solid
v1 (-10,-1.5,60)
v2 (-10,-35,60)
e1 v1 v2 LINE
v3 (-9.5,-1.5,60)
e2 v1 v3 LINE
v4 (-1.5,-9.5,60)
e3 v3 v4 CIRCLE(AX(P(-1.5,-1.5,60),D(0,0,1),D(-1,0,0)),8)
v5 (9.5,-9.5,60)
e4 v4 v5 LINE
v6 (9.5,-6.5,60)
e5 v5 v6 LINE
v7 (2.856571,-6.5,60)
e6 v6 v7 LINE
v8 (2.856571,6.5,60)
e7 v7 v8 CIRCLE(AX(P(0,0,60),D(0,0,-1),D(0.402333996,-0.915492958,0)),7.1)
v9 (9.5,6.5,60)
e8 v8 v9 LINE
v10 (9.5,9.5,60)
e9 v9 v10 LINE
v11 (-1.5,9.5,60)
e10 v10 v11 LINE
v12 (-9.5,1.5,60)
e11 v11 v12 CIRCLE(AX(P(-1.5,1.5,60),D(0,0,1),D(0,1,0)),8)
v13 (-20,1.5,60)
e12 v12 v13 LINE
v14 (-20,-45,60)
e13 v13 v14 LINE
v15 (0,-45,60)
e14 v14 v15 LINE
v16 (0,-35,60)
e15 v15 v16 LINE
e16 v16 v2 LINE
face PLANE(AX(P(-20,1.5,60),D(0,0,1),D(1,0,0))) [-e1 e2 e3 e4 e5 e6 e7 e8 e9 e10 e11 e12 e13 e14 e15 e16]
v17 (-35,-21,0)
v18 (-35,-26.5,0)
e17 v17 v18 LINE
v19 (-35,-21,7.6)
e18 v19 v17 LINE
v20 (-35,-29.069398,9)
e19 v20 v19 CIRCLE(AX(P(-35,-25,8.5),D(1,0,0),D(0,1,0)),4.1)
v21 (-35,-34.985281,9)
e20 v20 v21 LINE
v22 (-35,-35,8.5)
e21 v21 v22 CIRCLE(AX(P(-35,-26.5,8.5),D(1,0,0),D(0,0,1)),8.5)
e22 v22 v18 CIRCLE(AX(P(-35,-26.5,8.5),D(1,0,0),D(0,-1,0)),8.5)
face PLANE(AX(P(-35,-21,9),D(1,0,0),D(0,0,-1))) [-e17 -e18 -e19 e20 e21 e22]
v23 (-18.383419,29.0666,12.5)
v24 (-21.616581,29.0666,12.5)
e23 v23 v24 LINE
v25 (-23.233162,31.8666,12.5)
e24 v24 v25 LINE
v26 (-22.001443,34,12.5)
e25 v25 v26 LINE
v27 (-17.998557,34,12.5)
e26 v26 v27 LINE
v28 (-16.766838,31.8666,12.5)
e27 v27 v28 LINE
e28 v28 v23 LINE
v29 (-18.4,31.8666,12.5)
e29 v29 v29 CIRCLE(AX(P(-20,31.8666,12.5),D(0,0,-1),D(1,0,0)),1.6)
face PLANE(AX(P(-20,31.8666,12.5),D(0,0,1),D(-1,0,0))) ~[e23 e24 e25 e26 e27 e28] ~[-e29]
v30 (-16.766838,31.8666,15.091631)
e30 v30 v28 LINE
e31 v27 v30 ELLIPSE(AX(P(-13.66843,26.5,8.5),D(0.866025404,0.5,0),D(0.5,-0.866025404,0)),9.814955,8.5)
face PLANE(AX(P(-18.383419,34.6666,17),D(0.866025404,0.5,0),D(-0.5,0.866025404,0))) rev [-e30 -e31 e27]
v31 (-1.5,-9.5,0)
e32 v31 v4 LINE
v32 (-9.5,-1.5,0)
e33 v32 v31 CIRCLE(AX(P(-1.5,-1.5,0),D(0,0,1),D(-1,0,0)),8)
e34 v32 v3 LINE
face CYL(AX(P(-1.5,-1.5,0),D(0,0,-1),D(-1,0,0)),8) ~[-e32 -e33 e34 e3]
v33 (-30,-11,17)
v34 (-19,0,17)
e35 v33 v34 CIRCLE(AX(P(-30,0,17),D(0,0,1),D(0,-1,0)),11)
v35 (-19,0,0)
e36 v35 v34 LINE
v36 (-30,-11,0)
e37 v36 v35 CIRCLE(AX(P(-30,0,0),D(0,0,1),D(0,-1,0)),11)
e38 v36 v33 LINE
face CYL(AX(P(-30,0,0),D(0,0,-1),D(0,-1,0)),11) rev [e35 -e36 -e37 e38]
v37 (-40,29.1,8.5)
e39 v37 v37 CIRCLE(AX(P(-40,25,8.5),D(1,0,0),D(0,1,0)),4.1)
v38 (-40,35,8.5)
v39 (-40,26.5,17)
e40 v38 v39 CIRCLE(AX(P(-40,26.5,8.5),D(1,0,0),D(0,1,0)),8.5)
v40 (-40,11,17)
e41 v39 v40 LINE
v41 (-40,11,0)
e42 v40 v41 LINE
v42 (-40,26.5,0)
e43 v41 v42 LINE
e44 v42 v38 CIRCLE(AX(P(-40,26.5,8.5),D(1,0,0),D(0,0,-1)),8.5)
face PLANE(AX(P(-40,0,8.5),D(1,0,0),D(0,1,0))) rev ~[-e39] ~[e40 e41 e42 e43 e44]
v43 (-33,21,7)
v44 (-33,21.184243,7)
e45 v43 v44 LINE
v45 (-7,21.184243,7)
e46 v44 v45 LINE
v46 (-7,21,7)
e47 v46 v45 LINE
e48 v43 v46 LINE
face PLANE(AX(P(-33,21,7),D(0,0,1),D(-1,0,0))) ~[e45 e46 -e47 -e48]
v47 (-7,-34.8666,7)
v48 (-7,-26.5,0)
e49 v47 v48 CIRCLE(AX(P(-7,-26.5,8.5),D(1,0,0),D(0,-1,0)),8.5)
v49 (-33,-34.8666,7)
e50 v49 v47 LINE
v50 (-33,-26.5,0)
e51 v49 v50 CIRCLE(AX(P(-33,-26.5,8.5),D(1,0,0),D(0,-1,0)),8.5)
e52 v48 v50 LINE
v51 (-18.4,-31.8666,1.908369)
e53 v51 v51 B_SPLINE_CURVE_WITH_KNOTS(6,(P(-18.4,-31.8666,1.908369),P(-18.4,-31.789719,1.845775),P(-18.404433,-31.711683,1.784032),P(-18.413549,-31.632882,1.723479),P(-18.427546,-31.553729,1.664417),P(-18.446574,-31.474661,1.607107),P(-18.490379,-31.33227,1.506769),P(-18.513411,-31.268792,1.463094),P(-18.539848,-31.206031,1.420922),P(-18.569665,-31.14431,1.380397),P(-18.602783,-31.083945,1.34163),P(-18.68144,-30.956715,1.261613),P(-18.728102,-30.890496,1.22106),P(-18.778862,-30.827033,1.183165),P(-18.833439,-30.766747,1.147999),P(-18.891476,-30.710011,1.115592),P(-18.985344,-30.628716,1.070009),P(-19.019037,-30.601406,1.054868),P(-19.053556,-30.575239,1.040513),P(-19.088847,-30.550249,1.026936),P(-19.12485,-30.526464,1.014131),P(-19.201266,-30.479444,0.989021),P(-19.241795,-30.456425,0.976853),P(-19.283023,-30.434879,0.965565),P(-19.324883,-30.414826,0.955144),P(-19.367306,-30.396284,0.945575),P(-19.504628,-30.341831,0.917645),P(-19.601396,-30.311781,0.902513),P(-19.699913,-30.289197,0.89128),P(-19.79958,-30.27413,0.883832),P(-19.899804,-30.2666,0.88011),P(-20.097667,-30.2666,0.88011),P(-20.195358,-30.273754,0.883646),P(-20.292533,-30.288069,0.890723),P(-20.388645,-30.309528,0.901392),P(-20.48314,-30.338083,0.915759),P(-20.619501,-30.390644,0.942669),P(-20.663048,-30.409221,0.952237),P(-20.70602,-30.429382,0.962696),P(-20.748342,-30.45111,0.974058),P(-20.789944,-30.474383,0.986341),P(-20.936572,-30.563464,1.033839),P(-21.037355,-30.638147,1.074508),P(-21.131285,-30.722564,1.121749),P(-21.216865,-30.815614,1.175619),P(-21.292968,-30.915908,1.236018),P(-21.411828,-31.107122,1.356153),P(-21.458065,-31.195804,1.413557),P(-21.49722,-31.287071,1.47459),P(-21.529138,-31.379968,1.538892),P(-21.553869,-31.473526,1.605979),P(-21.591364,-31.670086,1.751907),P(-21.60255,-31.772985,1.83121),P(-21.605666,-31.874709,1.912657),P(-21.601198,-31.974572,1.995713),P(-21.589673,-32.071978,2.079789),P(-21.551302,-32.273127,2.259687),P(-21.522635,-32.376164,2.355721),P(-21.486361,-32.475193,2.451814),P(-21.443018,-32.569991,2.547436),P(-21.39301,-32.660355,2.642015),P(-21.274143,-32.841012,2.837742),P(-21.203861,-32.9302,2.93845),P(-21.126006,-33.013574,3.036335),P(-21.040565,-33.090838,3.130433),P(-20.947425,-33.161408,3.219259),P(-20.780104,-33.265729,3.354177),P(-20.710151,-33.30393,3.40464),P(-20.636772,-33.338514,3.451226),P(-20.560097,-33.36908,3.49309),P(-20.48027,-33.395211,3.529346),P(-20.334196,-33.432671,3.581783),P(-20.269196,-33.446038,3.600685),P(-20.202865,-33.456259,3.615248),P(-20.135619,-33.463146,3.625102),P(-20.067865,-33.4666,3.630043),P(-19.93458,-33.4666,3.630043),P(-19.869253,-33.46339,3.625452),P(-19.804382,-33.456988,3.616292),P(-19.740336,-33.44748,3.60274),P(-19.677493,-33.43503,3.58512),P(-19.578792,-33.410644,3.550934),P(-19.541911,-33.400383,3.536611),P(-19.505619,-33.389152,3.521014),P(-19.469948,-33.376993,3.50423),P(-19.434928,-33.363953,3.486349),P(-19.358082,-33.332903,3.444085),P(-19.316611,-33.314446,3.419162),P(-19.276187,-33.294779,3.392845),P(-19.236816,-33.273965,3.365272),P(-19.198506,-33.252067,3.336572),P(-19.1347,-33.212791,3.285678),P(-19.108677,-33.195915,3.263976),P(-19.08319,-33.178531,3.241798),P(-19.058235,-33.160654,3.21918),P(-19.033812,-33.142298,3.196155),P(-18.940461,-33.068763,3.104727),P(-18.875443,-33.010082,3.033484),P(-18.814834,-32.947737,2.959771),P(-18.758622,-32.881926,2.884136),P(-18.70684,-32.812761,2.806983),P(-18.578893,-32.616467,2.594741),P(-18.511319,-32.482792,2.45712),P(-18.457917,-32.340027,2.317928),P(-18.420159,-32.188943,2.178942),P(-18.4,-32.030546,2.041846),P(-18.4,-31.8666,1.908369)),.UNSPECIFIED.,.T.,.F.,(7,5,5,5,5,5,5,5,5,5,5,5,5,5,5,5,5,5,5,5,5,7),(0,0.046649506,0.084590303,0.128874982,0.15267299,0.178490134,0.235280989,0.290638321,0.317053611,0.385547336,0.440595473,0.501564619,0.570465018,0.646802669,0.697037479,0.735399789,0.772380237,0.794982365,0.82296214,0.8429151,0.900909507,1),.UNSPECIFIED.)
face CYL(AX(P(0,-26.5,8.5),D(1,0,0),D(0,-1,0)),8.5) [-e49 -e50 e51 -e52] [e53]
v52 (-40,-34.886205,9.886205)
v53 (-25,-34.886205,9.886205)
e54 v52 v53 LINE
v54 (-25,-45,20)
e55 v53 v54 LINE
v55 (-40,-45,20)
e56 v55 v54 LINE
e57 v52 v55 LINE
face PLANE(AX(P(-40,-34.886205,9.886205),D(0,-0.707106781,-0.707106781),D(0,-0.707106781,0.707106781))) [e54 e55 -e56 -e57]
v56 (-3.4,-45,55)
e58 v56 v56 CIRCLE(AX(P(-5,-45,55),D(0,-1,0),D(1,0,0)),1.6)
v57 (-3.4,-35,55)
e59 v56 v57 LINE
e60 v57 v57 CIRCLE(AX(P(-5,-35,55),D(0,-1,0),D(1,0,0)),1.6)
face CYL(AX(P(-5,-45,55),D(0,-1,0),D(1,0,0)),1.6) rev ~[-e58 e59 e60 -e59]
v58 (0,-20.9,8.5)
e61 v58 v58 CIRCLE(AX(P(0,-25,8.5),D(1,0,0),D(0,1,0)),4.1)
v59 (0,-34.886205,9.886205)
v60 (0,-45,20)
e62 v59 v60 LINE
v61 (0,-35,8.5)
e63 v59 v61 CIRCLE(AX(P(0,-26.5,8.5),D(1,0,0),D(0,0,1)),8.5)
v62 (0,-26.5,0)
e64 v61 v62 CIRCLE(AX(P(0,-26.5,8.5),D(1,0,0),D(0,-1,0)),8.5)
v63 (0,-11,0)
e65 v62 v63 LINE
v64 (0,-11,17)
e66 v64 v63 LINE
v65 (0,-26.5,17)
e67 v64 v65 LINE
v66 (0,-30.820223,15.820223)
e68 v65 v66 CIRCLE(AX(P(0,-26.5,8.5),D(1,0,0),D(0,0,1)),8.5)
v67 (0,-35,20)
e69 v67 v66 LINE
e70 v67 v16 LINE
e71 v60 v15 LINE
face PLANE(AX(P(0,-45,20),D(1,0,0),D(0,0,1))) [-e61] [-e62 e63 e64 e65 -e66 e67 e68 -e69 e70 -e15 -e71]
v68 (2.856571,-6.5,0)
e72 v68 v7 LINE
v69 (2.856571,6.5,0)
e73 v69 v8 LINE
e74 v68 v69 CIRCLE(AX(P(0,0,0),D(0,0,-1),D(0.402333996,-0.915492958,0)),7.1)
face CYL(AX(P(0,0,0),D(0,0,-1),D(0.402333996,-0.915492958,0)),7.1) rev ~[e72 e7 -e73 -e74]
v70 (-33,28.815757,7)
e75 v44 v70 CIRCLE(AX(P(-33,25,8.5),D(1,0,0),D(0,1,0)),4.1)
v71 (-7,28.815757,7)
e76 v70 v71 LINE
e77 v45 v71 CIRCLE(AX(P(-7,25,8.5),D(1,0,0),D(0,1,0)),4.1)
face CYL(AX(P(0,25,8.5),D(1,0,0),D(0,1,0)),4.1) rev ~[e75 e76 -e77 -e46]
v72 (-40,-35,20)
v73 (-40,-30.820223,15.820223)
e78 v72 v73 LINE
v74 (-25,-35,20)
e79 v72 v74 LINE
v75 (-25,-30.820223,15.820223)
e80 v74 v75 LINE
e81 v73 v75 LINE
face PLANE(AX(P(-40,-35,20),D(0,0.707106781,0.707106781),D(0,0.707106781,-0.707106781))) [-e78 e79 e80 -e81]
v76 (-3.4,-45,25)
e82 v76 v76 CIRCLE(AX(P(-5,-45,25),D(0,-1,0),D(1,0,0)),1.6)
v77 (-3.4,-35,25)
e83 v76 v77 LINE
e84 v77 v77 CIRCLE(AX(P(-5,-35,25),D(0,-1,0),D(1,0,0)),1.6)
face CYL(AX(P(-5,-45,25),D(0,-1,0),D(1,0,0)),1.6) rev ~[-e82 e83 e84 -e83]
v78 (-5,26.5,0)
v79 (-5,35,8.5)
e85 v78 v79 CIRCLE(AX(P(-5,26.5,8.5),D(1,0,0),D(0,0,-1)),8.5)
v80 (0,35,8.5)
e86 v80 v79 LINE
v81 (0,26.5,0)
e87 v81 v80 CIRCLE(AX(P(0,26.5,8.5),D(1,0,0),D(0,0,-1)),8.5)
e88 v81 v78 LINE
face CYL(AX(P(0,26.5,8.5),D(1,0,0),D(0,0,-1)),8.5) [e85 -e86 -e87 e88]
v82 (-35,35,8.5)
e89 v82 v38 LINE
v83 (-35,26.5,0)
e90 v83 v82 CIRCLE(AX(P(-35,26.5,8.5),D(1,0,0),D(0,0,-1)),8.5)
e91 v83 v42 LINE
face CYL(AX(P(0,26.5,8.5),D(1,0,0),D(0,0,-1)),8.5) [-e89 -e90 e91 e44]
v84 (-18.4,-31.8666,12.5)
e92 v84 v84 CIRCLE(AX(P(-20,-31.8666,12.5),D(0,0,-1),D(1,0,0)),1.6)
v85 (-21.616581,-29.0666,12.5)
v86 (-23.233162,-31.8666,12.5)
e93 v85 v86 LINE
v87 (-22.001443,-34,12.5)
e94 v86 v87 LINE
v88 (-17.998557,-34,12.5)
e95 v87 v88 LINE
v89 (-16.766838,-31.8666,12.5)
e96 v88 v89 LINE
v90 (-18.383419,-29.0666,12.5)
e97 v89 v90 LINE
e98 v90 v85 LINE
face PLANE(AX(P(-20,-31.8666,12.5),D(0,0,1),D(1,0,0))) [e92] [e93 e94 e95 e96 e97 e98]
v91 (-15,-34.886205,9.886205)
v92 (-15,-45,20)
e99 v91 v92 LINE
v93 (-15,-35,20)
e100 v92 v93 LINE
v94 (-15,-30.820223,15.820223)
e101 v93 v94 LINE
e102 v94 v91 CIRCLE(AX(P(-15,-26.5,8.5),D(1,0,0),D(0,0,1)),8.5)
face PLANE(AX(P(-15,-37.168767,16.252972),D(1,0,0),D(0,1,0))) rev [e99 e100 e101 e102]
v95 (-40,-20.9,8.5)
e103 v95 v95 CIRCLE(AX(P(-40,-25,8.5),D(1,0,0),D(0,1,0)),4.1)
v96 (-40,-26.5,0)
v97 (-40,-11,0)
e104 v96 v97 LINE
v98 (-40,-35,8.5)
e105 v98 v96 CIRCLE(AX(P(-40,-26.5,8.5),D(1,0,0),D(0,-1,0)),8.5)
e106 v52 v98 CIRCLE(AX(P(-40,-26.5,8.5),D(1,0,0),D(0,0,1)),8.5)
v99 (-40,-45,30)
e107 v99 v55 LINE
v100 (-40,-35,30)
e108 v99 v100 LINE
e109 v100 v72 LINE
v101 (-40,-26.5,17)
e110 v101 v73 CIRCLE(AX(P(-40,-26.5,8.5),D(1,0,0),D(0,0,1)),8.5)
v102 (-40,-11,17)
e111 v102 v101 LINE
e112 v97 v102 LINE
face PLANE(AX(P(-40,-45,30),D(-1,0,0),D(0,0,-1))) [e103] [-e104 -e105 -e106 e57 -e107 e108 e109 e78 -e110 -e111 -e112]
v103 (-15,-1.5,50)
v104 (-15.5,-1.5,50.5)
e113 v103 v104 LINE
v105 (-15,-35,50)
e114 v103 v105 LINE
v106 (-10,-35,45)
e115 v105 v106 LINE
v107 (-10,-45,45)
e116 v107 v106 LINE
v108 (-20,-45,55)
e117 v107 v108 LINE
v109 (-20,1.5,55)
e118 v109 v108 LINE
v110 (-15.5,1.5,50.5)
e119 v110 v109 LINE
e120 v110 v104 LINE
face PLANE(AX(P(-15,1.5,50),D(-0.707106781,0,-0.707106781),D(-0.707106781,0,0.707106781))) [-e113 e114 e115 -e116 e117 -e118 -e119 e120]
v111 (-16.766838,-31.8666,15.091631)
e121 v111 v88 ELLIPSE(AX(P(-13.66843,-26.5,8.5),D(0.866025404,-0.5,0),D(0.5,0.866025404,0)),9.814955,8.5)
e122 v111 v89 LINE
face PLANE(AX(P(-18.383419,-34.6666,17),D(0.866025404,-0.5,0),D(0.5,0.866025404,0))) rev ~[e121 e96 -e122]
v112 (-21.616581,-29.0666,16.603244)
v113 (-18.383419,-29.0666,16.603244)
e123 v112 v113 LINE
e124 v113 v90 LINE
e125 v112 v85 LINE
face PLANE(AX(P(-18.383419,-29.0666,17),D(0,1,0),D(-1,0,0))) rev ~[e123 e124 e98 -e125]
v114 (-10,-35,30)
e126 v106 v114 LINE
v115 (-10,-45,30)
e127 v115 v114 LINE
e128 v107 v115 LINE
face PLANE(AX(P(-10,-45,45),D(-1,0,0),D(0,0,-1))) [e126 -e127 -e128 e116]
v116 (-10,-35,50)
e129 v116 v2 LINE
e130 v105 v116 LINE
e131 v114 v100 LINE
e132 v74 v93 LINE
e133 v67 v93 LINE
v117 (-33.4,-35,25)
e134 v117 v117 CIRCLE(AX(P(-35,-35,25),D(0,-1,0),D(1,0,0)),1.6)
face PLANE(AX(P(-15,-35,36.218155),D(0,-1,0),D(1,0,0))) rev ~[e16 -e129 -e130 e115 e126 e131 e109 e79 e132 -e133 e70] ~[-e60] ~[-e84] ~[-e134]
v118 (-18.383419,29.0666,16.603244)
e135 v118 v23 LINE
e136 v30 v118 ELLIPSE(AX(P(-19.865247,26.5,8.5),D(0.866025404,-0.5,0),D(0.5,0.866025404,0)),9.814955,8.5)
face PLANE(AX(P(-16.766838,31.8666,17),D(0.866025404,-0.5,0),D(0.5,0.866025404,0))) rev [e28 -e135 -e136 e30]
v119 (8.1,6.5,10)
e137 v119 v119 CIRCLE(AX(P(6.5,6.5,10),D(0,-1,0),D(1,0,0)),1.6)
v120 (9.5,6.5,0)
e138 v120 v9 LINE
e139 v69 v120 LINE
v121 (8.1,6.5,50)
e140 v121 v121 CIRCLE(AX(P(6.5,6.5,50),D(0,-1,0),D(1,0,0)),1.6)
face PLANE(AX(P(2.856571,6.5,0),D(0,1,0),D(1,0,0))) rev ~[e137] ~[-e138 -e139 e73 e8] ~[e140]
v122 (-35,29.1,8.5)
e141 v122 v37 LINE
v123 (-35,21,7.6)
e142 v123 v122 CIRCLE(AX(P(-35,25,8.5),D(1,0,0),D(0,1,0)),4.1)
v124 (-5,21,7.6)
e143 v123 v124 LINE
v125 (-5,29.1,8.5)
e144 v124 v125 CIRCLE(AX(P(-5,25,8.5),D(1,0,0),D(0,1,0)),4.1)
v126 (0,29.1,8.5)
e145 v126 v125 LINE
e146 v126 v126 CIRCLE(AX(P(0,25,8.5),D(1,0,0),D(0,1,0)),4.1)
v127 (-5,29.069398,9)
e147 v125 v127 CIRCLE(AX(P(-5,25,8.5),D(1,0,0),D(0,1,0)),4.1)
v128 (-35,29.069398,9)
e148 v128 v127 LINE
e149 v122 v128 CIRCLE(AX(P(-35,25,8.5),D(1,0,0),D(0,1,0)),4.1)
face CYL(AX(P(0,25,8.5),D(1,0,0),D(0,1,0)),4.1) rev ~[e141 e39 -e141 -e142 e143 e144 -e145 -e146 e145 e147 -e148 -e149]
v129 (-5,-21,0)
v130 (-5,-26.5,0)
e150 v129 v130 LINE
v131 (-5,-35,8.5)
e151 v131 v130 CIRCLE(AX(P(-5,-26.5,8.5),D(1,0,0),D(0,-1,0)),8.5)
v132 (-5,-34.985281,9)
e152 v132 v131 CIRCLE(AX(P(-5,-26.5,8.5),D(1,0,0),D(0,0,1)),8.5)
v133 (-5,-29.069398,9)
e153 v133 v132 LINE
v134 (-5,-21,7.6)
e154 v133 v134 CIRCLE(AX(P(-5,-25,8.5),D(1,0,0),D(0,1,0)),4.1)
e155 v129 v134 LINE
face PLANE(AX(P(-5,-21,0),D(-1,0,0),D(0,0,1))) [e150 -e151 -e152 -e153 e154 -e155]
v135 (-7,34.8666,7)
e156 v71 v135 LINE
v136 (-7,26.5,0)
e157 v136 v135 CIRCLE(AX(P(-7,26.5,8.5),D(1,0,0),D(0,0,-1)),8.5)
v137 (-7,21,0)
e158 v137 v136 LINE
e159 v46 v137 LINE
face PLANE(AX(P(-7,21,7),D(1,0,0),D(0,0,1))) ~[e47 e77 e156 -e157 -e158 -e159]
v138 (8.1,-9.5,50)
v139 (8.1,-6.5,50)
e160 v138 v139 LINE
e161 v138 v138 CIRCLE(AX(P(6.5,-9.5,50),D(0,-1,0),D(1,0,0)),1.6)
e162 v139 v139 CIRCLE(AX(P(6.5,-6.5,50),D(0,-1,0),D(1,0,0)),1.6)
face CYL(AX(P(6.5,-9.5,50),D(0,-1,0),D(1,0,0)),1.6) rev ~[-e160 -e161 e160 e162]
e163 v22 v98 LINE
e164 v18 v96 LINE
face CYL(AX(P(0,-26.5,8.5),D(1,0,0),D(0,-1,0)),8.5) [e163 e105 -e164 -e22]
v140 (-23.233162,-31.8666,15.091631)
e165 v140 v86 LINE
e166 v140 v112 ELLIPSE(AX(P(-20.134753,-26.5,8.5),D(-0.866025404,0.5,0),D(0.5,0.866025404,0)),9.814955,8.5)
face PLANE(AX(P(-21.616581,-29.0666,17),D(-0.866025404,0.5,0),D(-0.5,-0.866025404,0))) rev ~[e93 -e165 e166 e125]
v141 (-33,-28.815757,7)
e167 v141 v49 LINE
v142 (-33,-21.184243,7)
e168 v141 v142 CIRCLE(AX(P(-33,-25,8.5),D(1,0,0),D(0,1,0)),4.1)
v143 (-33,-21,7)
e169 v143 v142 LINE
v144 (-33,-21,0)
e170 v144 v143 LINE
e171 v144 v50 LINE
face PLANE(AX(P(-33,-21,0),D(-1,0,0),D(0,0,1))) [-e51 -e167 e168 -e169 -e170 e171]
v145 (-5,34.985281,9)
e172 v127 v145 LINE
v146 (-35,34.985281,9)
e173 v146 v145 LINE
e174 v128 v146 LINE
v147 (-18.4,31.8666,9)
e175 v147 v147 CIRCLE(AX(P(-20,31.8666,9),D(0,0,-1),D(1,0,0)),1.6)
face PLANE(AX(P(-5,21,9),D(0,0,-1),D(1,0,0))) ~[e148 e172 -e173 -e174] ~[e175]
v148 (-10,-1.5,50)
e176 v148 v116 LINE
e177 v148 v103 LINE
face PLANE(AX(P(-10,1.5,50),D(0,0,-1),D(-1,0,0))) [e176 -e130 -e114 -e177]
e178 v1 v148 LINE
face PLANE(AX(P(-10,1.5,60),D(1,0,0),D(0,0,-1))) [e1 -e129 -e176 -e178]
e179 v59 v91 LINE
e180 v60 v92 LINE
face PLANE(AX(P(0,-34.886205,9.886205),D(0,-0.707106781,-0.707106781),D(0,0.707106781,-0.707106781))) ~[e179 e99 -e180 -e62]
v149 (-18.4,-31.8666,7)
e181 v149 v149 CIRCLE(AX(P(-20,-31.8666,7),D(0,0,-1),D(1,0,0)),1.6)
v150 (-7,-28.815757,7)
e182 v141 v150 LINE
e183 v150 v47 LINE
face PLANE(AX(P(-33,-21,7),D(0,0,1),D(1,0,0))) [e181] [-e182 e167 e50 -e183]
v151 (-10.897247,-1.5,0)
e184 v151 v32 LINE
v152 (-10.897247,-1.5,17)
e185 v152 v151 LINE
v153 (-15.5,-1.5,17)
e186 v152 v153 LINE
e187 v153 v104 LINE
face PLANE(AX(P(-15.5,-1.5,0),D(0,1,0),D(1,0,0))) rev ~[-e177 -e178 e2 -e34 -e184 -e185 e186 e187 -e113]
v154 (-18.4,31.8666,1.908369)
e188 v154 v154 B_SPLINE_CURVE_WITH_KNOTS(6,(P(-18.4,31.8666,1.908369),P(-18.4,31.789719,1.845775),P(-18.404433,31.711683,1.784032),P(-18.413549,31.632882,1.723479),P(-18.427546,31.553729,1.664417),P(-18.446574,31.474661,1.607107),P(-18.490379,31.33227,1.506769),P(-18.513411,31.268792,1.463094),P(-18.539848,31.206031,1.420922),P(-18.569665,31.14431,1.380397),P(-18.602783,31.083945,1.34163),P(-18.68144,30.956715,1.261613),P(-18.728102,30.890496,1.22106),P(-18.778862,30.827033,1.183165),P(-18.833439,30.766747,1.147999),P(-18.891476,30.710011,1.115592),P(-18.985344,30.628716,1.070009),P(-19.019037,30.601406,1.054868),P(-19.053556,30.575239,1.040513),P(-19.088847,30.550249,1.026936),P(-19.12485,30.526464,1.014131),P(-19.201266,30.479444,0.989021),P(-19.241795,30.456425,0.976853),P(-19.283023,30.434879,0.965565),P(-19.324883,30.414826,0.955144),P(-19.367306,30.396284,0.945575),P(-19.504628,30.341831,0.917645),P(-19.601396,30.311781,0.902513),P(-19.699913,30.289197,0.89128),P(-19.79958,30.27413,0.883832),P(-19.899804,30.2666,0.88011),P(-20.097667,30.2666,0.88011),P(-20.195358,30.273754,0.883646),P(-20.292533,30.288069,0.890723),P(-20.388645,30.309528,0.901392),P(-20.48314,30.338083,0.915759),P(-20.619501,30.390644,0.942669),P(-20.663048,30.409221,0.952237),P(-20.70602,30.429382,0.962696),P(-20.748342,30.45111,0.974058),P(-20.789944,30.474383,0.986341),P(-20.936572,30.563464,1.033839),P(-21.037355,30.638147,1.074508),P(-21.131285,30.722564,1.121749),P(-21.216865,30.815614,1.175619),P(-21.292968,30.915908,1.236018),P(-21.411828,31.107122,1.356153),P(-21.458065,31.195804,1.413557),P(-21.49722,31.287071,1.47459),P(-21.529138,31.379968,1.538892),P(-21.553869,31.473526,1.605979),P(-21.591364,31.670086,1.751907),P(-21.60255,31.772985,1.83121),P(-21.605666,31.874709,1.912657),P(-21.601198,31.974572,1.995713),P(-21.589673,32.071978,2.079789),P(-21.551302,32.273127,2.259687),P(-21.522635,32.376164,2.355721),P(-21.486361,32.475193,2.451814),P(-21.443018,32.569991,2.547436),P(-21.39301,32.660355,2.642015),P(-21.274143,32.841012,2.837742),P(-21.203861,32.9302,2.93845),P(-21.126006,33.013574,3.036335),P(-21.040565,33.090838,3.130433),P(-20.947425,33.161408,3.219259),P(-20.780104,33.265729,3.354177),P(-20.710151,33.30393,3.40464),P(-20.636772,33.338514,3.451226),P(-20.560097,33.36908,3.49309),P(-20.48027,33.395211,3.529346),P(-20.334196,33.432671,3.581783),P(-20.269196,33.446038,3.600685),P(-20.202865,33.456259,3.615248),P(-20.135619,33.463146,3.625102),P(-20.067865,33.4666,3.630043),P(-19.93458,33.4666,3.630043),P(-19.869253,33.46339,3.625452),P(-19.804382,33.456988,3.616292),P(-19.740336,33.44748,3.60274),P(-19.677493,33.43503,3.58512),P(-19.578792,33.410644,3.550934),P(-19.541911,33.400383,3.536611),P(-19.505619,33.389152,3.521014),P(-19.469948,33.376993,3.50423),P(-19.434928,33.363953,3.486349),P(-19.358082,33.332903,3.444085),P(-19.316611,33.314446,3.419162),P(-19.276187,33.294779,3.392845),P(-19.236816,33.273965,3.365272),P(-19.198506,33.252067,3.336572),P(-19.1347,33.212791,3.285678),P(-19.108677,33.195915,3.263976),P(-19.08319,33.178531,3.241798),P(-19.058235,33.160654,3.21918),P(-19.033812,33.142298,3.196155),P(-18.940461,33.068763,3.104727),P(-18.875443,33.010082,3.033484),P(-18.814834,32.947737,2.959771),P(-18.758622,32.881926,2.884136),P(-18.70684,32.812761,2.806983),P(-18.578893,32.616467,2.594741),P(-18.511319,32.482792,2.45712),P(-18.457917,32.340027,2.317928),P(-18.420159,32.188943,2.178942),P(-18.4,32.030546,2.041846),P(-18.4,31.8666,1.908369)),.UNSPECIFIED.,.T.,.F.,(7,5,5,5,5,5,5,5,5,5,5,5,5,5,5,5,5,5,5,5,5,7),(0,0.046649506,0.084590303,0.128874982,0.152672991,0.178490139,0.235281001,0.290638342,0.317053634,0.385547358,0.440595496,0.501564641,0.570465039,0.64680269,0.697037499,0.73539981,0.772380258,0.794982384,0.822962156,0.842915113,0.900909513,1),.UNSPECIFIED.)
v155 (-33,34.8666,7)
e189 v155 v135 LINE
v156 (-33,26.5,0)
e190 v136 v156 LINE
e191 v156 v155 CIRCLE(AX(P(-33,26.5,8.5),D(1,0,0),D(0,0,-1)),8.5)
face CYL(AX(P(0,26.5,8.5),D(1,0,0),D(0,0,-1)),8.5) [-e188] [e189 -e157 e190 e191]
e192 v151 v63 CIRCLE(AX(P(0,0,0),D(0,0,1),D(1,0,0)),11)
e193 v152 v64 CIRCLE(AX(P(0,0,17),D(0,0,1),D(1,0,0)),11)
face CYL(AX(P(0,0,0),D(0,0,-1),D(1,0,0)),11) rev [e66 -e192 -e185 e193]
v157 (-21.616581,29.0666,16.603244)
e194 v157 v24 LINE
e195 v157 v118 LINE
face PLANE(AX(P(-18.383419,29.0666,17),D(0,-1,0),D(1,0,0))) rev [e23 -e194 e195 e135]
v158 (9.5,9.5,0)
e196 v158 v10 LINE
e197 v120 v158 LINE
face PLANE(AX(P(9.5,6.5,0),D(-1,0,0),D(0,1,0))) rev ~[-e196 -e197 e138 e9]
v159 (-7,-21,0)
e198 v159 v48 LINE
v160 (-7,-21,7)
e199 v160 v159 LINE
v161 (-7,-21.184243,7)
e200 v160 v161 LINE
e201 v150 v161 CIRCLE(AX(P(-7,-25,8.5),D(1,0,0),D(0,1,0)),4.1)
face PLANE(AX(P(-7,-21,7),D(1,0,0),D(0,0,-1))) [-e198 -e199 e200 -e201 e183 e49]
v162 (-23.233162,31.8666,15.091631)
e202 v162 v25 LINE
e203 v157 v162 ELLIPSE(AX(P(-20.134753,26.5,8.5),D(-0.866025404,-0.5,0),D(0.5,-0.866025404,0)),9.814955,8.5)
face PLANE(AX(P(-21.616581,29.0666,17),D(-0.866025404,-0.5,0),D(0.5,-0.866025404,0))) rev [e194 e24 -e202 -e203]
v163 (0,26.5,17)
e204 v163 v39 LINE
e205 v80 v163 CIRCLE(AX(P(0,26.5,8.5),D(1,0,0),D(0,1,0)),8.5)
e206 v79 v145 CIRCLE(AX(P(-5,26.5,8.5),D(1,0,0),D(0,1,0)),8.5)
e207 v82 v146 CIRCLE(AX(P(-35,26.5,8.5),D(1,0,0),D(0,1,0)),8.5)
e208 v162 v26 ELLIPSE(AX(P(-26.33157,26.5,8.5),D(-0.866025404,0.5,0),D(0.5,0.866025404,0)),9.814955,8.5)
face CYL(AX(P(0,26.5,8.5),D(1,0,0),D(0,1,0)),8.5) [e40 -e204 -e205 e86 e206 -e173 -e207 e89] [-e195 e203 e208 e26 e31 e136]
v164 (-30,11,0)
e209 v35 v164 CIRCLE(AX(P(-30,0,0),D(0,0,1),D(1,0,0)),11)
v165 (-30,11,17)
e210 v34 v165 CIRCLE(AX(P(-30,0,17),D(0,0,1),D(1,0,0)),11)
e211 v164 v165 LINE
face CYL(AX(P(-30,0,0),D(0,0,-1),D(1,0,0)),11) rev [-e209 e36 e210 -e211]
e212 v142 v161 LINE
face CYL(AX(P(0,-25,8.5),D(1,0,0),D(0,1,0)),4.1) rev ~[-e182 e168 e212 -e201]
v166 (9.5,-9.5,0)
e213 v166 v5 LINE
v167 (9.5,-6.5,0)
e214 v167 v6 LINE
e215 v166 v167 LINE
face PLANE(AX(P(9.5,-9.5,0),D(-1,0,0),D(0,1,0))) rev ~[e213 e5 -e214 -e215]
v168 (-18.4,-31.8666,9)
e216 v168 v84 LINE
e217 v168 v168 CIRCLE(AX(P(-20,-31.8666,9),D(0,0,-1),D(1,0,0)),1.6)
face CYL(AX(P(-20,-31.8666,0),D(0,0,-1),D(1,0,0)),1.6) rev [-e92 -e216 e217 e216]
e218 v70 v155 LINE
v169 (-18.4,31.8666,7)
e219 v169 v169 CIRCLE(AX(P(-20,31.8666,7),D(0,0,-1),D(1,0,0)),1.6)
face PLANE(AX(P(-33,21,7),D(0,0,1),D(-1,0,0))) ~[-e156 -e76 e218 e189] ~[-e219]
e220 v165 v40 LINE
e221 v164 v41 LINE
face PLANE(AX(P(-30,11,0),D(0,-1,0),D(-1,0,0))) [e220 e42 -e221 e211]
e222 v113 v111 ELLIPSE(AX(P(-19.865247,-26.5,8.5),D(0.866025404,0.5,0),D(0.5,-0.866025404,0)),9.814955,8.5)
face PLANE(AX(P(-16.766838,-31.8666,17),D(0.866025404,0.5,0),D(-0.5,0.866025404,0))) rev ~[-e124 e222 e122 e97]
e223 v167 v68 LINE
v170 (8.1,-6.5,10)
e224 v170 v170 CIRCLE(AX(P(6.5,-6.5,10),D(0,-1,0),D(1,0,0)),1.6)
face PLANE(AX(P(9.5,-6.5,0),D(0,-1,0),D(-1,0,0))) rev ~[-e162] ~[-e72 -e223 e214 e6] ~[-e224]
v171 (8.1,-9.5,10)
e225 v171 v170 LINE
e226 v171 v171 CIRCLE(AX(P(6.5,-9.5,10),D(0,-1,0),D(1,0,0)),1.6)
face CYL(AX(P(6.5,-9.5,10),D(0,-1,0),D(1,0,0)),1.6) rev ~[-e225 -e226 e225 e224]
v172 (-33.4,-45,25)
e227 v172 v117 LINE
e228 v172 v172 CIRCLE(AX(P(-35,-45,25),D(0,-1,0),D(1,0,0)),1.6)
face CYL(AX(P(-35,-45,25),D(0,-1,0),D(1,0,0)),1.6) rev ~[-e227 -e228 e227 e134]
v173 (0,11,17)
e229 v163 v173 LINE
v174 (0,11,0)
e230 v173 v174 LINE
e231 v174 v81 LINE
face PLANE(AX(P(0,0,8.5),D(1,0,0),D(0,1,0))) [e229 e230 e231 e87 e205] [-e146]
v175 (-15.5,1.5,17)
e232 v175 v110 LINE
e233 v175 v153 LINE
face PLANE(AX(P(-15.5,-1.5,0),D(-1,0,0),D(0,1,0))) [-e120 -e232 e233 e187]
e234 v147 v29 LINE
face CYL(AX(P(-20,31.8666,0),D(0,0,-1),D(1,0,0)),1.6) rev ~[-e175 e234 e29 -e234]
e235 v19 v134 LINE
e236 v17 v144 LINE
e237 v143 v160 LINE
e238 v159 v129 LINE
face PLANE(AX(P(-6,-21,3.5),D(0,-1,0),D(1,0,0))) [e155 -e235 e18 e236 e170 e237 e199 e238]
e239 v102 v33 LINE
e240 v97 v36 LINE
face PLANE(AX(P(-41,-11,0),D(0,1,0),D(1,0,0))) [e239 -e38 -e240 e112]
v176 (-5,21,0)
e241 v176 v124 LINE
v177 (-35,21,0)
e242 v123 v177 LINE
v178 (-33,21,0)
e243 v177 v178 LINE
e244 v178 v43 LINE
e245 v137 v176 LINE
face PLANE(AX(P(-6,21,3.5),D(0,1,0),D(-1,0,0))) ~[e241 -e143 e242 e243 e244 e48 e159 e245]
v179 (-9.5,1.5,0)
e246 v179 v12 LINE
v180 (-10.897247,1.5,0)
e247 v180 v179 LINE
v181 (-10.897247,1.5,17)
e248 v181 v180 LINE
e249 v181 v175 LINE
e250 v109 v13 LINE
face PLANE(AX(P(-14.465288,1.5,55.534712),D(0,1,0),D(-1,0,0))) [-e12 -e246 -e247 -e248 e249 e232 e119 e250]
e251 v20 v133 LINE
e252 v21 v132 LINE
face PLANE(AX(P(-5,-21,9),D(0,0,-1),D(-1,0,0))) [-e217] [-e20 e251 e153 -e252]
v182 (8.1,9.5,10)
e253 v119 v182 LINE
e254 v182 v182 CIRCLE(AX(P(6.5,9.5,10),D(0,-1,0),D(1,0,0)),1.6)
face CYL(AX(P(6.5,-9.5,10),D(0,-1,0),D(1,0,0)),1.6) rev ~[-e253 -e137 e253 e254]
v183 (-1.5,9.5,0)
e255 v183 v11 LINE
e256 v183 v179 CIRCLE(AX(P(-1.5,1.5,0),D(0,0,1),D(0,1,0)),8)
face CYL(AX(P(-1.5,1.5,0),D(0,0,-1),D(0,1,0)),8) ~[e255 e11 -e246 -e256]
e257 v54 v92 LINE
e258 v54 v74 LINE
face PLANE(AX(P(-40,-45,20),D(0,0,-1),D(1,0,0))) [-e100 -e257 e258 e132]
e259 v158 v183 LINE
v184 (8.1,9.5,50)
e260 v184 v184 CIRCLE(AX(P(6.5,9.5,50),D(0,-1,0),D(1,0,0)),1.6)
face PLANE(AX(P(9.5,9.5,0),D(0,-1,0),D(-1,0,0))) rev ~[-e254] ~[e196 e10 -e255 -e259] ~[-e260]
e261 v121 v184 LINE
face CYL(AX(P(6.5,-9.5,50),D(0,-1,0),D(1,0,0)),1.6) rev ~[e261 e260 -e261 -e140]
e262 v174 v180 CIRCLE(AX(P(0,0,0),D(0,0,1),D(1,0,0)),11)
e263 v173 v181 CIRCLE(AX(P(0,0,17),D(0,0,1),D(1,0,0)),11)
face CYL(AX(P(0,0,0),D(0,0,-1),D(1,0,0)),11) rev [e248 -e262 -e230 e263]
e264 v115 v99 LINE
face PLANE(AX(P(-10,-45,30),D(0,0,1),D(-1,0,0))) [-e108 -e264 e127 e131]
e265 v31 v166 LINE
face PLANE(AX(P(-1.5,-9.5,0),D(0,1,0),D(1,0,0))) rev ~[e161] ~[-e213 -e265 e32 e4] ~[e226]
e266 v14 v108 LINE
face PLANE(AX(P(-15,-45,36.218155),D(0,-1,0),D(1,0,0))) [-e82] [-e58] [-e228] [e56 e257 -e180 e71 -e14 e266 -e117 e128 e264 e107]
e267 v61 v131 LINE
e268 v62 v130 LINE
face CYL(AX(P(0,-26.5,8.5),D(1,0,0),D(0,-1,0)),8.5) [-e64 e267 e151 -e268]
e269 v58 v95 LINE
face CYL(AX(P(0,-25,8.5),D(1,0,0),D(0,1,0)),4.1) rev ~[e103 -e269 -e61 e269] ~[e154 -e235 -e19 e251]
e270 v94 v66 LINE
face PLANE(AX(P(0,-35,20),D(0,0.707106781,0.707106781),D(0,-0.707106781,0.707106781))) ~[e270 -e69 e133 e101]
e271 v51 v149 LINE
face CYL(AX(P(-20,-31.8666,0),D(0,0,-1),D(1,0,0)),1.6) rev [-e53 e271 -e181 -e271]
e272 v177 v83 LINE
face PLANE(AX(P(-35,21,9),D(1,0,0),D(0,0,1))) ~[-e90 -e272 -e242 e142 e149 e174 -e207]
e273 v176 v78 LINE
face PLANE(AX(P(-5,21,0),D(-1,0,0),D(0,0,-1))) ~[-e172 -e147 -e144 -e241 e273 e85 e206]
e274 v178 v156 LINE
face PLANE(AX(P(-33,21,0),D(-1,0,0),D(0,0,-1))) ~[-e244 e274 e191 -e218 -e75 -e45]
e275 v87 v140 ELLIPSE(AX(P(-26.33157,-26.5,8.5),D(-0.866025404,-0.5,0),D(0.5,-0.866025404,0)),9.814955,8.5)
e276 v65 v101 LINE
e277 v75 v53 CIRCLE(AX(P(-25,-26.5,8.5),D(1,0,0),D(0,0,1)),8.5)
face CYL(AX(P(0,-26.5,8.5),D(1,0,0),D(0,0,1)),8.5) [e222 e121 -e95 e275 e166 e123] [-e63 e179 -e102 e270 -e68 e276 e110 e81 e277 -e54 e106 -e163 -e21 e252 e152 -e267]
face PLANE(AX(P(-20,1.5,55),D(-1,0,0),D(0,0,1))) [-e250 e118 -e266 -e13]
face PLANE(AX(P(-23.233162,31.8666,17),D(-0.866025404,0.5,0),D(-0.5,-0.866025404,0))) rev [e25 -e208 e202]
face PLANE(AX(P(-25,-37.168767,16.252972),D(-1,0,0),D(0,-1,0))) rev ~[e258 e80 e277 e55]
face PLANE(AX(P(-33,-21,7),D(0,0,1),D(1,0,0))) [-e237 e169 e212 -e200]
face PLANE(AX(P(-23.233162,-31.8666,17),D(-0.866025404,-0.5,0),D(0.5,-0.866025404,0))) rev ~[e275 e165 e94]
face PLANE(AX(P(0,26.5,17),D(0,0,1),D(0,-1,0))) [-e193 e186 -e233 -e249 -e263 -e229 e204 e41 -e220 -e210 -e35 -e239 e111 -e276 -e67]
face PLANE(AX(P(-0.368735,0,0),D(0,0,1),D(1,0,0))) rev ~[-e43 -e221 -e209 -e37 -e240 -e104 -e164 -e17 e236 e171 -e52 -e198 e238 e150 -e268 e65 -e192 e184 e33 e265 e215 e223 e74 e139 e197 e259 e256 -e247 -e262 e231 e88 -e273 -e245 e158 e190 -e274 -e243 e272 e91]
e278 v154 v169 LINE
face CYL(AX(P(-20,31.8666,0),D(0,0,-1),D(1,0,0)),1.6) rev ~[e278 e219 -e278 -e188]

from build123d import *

# Parameters (mm, degrees)
F1_R      = 4.1
F2_DEPTH  = 40
F3_R      = 11
F4_DEPTH  = 17
F5_W      = 6
F5_H      = 3
F6_DEPTH  = 60
F7_R      = 1.6
F8_DEPTH  = 19
F10_DEPTH = 17
F11_W     = 2
F11_H     = 7
F11_H_2   = 2
F11_W_2   = 26
F12_DEPTH = 15
F13_R     = 1.6
F14_DEPTH = 17
F16_DEPTH = 4.5
F19_DEPTH = 15
F21_R     = 1.6
F22_DEPTH = 10
F24_DEPTH = 46.5


# Not quite as in the source:
# - a pattern or mirror of a feature is missing from the dataset's text; its kind, count and spacing are read off the source's solid


with BuildPart() as f2:
    # F1 (on Right) → F2 (new body)
    with BuildSketch(Plane.YZ):
        with BuildLine():
            ThreePointArc((-35, 8.5), (-32.5104076401, 2.4895923599), (-26.5, 0))
            Line((-26.5, 0), (26.5, 0))
            ThreePointArc((26.5, 0), (32.5104076401, 2.4895923599), (35, 8.5))
            ThreePointArc((35, 8.5), (32.5104076401, 14.5104076401), (26.5, 17))
            Line((26.5, 17), (-26.5, 17))
            ThreePointArc((-26.5, 17), (-32.5104076401, 14.5104076401), (-35, 8.5))
        make_face()
        with Locations((-25, 8.5)):
            Circle(F1_R, mode=Mode.SUBTRACT)
        with Locations((25, 8.5)):
            Circle(F1_R, mode=Mode.SUBTRACT)
    extrude(amount=-F2_DEPTH)

    # F3 (on Top) → F4 (cut)
    with BuildSketch(Plane.XY):
        Circle(F3_R)
    extrude(amount=F4_DEPTH, mode=Mode.SUBTRACT)

    # F5 (on Top) → F6 (join)
    with BuildSketch(Plane.XY):
        with BuildLine():
            Line((9.5, 6.5), (9.5, 9.5))
            Line((9.5, 9.5), (-1.5, 9.5))
            ThreePointArc((-1.5, 9.5), (-7.1568542495, 7.1568542495), (-9.5, 1.5))
            Line((-9.5, 1.5), (-9.5, -1.5))
            ThreePointArc((-9.5, -1.5), (-7.1568542495, -7.1568542495), (-1.5, -9.5))
            Line((-1.5, -9.5), (9.5, -9.5))
            Line((9.5, -9.5), (9.5, -6.5))
            Line((9.5, -6.5), (2.8565713714, -6.5))
            ThreePointArc((2.8565713714, -6.5), (-7.1, 0), (2.8565713714, 6.5))
            Line((2.8565713714, 6.5), (9.5, 6.5))
        make_face()
        with Locations((-12.5, 0)):
            Rectangle(F5_W, F5_H)
    extrude(amount=F6_DEPTH)

    # F7 (on face) → F8 (cut)
    with BuildSketch(Plane.XZ.offset(9.5)):
        with Locations((6.5, 50)):
            Circle(F7_R)
        with Locations((6.5, 10)):
            Circle(F7_R)
    extrude(amount=-F8_DEPTH, mode=Mode.SUBTRACT)

    # F9 (on Top) → F10 (cut)
    with BuildSketch(Plane.XY):
        with BuildLine():
            ThreePointArc((-19, 0), (-22.2218254069, 7.7781745931), (-30, 11))
            Line((-30, 11), (-41, 11))
            Line((-41, 11), (-41, -11))
            Line((-41, -11), (-30, -11))
            ThreePointArc((-30, -11), (-22.2218254069, -7.7781745931), (-19, 0))
        make_face()
    extrude(amount=F10_DEPTH, mode=Mode.SUBTRACT)

    # F11 (on offset) → F12 (cut)
    with BuildSketch(Plane.XZ.offset(21)):
        with Locations((-6, 3.5)):
            Rectangle(F11_W, F11_H)
        with Locations((-6, 8)):
            Rectangle(F11_W, F11_H_2)
        with Locations((-20, 8)):
            Rectangle(F11_W_2, F11_H_2)
        with Locations((-34, 8)):
            Rectangle(F11_W, F11_H_2)
        with Locations((-34, 3.5)):
            Rectangle(F11_W, F11_H)
    f12 = extrude(amount=F12_DEPTH, mode=Mode.SUBTRACT)

    # F12_copies: F12 across plane
    add(f12.mirror(Plane.ZX), mode=Mode.SUBTRACT)

    # F13 (on Top) → F14 (cut)
    with BuildSketch(Plane.XY):
        with Locations((-20, -31.8666002653)):
            Circle(F13_R)
    f14 = extrude(amount=F14_DEPTH, mode=Mode.SUBTRACT)

    # F14_copies: F14 across plane
    add(f14.mirror(Plane.ZX), mode=Mode.SUBTRACT)

    # F15 (on face) → F16 (cut)
    with BuildSketch(Plane.XY.offset(17)):
        Polygon((-21.6165807537, -29.0666002653), (-23.2331615075, -31.8666002653), (-21.6165807537, -34.6666002653), (-18.3834192463, -34.6666002653), (-16.7668384925, -31.8666002653), (-18.3834192463, -29.0666002653), align=None)
    f16 = extrude(amount=-F16_DEPTH, mode=Mode.SUBTRACT)

    # F16_copies: F16 across plane
    add(f16.mirror(Plane.ZX), mode=Mode.SUBTRACT)

    # F18 (on face) → F19 (join)
    with BuildSketch(Plane(origin=(-40, 0, 0), x_dir=(0, -1, 0), z_dir=(-1, 0, 0))):
        Polygon((34.8862050714, 9.8862050714), (45, 20), (35, 20), (29.8862050714, 14.8862050714), align=None)
    f19 = extrude(amount=-F19_DEPTH)

    # F19_copies: F19 across plane
    add(f19.mirror(Plane(origin=(-20, 0, 0), x_dir=(0, 0, 1), z_dir=(1, 0, 0))))

    # F21 (on offset) → F22 (join)
    with BuildSketch(Plane.XZ.offset(45)):
        Polygon((-40, 20), (0, 20), (0, 60), (-10, 60), (-20, 60), (-20, 55), (-10, 45), (-10, 30), (-40, 30), align=None)
        with Locations((-35, 25)):
            Circle(F21_R, mode=Mode.SUBTRACT)
        with Locations((-5, 25)):
            Circle(F21_R, mode=Mode.SUBTRACT)
        with Locations((-5, 55)):
            Circle(F21_R, mode=Mode.SUBTRACT)
    extrude(amount=-F22_DEPTH)

    # F23 (on face) → F24 (join)
    with BuildSketch(Plane(origin=(0, 1.5, 0), x_dir=(-1, 0, 0), z_dir=(0, 1, 0))):
        Polygon((20, 60), (10, 60), (10, 50), (15, 50), (20, 55), align=None)
    extrude(amount=-F24_DEPTH)


solid = f2.part
